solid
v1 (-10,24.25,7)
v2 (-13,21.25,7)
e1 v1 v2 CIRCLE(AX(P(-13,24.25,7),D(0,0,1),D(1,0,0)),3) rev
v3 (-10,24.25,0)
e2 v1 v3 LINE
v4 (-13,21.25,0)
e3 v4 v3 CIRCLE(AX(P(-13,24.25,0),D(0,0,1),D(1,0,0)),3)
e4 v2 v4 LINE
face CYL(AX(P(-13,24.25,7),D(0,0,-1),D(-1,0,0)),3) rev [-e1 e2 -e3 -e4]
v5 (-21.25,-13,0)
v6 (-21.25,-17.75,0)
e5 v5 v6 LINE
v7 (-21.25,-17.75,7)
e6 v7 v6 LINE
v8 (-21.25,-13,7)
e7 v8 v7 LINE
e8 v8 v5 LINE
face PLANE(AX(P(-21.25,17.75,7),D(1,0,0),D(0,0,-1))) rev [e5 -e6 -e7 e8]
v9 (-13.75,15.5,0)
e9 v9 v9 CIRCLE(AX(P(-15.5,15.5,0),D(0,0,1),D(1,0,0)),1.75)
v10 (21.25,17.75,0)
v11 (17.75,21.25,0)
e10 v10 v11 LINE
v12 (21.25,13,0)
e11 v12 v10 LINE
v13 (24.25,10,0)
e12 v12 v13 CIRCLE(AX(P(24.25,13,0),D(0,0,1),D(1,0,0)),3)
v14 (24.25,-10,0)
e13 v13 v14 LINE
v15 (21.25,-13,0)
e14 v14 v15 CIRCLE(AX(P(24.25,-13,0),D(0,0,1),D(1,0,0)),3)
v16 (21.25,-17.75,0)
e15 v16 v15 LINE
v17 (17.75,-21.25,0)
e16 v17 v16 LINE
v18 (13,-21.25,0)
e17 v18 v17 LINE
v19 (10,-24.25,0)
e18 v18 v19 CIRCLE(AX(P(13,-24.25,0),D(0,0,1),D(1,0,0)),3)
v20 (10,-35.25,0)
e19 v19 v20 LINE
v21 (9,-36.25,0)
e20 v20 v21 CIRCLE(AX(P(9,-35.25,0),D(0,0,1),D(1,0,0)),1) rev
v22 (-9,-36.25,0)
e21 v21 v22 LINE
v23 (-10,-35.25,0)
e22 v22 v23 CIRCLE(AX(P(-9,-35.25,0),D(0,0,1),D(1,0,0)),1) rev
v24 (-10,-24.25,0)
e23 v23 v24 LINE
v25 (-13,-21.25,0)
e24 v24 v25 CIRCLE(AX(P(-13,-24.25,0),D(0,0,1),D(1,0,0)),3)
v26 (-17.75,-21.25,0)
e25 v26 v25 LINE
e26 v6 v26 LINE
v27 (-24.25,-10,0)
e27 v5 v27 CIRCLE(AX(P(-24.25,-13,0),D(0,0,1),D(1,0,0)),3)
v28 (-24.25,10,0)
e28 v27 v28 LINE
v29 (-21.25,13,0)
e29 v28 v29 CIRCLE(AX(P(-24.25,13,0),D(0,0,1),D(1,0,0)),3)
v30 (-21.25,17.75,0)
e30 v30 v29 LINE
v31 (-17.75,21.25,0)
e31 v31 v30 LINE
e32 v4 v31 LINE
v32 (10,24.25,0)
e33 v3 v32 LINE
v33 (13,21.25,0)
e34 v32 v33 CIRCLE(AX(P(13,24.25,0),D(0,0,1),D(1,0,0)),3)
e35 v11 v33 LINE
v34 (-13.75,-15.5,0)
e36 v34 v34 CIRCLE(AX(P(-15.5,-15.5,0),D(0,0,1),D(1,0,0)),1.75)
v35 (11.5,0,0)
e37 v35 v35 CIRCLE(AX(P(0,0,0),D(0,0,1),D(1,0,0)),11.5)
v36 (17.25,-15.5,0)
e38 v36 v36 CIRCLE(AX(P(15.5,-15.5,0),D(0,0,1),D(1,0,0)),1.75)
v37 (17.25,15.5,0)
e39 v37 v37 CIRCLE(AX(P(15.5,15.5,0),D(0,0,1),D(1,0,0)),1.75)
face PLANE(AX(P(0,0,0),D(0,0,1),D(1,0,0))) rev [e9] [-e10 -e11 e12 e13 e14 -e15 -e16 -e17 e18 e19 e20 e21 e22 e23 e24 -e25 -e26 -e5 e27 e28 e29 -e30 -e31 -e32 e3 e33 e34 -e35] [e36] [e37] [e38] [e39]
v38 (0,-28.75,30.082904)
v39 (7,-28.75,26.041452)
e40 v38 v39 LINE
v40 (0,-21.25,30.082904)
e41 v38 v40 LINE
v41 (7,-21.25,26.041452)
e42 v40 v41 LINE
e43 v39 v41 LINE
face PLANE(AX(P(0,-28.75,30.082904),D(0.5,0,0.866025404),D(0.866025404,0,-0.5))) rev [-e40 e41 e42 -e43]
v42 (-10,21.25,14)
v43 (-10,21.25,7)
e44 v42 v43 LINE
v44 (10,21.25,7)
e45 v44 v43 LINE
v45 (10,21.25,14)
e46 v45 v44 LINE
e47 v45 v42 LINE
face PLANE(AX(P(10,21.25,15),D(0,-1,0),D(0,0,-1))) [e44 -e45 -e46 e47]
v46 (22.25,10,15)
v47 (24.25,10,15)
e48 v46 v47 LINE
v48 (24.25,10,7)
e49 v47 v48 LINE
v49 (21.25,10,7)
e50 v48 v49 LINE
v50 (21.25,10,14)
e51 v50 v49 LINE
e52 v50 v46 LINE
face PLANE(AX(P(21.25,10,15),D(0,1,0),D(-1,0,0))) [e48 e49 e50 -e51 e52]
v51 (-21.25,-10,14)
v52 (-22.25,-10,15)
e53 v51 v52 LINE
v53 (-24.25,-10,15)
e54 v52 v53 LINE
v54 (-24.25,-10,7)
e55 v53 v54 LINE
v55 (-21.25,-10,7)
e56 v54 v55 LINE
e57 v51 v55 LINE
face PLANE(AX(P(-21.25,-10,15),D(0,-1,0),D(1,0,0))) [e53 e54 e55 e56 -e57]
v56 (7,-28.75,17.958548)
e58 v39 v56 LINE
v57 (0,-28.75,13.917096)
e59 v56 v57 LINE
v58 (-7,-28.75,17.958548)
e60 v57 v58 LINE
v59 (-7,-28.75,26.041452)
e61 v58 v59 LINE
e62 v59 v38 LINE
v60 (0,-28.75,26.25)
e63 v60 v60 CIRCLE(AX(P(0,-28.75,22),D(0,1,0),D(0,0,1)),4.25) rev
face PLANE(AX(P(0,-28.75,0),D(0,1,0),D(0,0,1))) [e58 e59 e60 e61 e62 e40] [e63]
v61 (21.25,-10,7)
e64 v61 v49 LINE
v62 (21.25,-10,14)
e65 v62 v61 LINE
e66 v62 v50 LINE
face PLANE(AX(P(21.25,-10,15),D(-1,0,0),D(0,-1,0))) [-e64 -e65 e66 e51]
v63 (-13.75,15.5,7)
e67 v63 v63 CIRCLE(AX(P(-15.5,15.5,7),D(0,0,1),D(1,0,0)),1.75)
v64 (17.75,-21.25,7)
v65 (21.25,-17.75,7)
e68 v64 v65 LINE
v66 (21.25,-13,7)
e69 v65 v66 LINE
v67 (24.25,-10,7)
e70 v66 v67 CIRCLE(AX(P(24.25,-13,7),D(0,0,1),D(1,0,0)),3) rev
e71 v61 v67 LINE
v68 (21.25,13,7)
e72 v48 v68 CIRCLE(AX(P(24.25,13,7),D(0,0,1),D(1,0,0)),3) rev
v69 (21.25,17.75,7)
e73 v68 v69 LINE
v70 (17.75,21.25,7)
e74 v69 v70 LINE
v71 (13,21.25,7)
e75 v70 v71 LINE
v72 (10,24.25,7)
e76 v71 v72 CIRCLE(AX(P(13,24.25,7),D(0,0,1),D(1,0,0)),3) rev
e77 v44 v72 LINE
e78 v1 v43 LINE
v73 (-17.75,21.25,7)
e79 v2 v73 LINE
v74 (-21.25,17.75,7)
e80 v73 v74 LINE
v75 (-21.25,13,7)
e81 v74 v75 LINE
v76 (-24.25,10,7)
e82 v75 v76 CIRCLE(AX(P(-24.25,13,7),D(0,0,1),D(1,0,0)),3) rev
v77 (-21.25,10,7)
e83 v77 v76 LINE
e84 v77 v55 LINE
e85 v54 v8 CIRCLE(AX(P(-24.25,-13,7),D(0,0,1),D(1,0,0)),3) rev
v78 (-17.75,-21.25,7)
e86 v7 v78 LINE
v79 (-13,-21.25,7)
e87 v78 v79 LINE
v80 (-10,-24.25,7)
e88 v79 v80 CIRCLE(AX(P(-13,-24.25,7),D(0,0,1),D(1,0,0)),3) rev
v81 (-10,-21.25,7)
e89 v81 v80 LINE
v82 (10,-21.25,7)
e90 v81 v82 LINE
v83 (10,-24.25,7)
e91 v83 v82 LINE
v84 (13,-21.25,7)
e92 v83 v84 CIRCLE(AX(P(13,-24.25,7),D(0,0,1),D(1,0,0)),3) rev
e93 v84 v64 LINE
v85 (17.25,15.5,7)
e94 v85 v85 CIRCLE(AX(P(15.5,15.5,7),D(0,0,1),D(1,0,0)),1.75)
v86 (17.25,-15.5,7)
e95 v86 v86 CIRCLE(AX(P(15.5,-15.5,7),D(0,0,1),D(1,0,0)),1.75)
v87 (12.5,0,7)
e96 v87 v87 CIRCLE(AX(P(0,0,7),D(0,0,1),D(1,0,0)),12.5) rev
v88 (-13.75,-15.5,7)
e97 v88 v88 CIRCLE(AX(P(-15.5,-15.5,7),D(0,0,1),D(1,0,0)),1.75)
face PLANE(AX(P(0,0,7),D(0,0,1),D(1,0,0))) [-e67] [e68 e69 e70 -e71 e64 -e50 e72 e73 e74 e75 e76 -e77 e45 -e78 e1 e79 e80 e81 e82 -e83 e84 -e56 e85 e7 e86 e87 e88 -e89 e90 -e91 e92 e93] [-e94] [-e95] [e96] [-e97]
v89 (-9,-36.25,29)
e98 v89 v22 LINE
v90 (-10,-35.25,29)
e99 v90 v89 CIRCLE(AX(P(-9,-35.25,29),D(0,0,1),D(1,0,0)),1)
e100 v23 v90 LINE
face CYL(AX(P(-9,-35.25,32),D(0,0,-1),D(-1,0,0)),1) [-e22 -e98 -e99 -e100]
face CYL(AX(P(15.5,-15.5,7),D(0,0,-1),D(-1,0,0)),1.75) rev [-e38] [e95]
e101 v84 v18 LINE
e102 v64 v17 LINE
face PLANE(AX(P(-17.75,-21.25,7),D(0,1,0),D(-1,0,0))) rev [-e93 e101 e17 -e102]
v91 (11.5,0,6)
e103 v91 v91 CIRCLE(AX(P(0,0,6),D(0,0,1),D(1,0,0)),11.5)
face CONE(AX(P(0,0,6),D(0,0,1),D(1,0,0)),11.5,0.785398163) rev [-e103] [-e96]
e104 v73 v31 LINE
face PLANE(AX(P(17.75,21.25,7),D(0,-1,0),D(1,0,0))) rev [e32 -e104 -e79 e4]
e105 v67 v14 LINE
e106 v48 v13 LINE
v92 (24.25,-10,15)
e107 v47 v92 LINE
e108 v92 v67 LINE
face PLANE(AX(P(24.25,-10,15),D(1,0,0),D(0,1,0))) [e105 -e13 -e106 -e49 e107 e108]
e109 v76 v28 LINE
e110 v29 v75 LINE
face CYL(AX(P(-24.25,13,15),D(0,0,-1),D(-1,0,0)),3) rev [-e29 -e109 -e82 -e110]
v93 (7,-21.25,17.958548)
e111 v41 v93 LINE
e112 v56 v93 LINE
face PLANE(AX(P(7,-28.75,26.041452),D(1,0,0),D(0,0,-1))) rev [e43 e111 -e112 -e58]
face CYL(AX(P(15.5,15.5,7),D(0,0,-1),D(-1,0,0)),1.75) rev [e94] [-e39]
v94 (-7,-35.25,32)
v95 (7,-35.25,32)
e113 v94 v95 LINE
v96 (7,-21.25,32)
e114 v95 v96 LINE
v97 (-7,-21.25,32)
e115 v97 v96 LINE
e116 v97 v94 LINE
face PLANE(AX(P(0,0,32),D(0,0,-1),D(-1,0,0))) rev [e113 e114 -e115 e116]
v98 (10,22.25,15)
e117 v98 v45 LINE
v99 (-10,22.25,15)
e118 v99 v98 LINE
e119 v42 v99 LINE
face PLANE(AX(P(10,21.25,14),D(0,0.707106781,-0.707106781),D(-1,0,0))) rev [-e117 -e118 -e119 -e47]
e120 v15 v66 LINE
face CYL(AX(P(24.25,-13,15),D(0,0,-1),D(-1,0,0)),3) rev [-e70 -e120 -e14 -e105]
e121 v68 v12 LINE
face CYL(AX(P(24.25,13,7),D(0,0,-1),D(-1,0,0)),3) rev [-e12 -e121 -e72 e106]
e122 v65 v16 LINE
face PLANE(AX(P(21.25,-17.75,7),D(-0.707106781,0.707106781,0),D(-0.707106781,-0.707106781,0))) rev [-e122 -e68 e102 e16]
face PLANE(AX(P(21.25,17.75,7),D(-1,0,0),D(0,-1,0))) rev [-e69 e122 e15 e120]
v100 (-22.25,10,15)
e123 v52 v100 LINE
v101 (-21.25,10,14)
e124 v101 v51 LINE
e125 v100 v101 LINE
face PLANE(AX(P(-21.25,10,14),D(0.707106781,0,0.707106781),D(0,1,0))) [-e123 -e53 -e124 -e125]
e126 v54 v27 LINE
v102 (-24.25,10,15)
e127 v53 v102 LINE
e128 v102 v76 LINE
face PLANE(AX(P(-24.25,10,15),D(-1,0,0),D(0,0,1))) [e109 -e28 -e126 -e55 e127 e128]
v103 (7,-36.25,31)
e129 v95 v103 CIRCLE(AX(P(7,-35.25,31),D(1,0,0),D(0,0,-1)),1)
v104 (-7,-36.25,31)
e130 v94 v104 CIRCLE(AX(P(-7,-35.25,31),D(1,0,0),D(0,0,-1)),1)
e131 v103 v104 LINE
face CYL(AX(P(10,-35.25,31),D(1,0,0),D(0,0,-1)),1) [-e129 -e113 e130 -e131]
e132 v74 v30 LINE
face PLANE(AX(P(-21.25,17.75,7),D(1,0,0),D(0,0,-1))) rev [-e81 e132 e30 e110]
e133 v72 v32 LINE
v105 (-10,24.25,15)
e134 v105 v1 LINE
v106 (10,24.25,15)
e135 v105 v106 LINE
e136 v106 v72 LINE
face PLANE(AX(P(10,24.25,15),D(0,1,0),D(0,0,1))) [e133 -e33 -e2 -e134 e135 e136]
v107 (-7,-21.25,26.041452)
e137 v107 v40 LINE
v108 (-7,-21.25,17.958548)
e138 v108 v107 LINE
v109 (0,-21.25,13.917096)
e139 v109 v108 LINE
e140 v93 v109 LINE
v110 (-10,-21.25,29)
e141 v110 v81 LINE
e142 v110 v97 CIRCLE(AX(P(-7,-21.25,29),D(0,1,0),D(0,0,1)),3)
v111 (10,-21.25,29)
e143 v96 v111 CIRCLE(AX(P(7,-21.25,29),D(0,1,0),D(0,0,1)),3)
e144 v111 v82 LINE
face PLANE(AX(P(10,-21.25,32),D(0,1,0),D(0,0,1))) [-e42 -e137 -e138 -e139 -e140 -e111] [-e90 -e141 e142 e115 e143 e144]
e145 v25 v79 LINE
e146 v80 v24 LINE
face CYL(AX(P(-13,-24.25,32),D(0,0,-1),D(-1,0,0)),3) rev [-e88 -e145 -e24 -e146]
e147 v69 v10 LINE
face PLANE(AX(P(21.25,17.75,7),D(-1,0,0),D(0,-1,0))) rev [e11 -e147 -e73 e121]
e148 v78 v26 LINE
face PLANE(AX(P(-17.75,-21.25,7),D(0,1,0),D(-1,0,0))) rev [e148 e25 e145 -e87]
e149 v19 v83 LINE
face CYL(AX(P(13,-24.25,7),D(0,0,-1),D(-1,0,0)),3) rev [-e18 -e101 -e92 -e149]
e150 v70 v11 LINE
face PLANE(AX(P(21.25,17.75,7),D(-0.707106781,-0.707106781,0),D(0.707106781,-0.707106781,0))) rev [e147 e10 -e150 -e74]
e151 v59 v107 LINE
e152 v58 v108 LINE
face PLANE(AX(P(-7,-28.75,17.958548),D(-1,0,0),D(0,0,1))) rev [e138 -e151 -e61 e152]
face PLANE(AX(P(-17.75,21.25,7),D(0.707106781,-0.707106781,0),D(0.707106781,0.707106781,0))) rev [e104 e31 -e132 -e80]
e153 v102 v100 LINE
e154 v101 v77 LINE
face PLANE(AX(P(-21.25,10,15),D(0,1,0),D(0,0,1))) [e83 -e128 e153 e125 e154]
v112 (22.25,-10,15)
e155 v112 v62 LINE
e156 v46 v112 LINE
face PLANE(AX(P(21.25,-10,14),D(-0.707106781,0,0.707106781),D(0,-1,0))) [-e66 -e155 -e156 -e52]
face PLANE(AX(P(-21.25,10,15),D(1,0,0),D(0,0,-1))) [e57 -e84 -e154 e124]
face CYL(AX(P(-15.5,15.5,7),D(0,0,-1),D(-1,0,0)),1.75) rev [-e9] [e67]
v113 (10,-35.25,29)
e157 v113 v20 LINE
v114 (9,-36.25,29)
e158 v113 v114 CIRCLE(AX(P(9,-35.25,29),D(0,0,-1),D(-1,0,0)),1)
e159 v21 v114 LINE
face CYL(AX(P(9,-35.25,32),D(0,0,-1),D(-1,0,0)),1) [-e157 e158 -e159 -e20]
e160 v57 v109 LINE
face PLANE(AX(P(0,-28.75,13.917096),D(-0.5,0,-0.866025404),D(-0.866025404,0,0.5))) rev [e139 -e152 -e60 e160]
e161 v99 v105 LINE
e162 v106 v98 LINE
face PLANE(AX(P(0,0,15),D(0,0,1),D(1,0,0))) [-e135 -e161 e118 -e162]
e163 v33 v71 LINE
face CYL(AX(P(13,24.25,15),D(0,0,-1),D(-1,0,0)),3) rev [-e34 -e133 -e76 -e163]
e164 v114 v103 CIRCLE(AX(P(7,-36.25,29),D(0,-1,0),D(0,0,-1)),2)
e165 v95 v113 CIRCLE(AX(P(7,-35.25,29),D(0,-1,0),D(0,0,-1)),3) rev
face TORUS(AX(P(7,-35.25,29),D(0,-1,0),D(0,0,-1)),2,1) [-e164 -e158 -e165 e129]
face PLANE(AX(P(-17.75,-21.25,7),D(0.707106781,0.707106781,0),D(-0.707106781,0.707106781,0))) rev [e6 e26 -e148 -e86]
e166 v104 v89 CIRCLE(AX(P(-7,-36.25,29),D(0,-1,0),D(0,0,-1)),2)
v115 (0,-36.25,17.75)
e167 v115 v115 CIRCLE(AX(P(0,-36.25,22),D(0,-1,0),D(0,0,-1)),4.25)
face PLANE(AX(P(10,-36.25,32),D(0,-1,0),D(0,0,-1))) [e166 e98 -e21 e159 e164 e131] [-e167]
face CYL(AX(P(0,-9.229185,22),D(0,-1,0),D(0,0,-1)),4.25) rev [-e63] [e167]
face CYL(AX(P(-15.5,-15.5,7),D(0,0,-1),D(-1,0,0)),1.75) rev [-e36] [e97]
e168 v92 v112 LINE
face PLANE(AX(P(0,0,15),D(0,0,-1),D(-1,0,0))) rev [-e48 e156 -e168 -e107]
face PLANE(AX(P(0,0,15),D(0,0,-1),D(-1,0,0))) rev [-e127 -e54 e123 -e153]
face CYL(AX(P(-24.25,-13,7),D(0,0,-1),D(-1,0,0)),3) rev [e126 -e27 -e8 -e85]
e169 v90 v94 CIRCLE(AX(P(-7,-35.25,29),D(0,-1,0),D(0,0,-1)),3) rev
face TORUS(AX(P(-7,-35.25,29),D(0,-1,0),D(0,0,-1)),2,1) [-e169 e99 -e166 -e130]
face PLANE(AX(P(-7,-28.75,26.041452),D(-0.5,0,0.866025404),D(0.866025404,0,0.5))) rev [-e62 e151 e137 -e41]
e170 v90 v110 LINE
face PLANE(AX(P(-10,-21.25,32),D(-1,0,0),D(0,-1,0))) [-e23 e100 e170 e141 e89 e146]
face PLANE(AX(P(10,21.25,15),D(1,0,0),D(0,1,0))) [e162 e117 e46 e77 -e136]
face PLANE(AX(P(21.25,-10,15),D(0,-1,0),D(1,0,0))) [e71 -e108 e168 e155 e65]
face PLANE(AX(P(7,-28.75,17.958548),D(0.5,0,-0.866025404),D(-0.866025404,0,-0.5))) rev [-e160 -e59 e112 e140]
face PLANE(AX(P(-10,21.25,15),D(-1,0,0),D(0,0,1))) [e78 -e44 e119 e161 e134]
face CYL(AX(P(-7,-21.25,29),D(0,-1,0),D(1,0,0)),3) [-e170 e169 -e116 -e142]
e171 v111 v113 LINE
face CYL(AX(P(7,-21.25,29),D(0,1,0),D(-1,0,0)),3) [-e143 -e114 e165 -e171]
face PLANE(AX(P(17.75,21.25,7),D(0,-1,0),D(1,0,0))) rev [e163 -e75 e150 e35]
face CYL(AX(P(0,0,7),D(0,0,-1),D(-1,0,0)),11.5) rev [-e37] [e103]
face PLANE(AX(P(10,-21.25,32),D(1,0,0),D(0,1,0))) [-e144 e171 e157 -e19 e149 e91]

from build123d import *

# Parameters (mm, degrees)
ESQUISSE1_R             = 11.5
ESQUISSE1_R_2           = 1.75
BOSS_EXTRU_1_DEPTH      = 7
ESQUISSE2_W             = 20
ESQUISSE2_H             = 3
ESQUISSE2_W_2           = 3
ESQUISSE2_H_2           = 20
BOSS_EXTRU_2_DEPTH      = 15
ESQUISSE3_W             = 20
ESQUISSE3_H             = 15
BOSS_EXTRU_3_DEPTH      = 32
CONG_1_R                = 3
CONG_2_R                = 3
CHANFREIN1_SIZE         = 1
ESQUISSE4_R             = 4.25
ENL_V_MAT_EXTRU_1_DEPTH = 15
CONG_3_R                = 1
ENL_V_MAT_EXTRU_2_DEPTH = 7.5


with BuildPart() as part:
    # Esquisse1 → Boss.-Extru.1 (new body)
    with BuildSketch(Plane.XY):
        Polygon((-17.749999999, 21.249999999), (-21.249999999, 17.749999999), (-21.249999999, -17.749999999), (-17.749999999, -21.250000001), (17.749999999, -21.250000001), (21.249999999, -17.749999999), (21.249999999, 17.749999999), (17.749999999, 21.249999999), align=None)
        Circle(ESQUISSE1_R, mode=Mode.SUBTRACT)
        with Locations((-15.5, 15.5)):
            Circle(ESQUISSE1_R_2, mode=Mode.SUBTRACT)
        with Locations((15.5, 15.5)):
            Circle(ESQUISSE1_R_2, mode=Mode.SUBTRACT)
        with Locations((15.5, -15.5)):
            Circle(ESQUISSE1_R_2, mode=Mode.SUBTRACT)
        with Locations((-15.5, -15.5)):
            Circle(ESQUISSE1_R_2, mode=Mode.SUBTRACT)
    extrude(amount=BOSS_EXTRU_1_DEPTH)

    # Esquisse2 → Boss.-Extru.2 (add)
    with BuildSketch(Plane(origin=(0, 0, 0), x_dir=(-1, 0, 0), z_dir=(0, 0, -1))):
        with Locations((0, 22.749999999)):
            Rectangle(ESQUISSE2_W, ESQUISSE2_H)
        with Locations((22.749999999, 0)):
            Rectangle(ESQUISSE2_W_2, ESQUISSE2_H_2)
        with Locations((-22.749999999, 0)):
            Rectangle(ESQUISSE2_W_2, ESQUISSE2_H_2)
    extrude(amount=-BOSS_EXTRU_2_DEPTH)

    # Esquisse3 → Boss.-Extru.3 (add)
    with BuildSketch(Plane(origin=(0, 0, 0), x_dir=(-1, 0, 0), z_dir=(0, 0, -1))):
        with Locations((0, -28.750000001)):
            Rectangle(ESQUISSE3_W, ESQUISSE3_H)
    extrude(amount=-BOSS_EXTRU_3_DEPTH)

    # Congé1
    cong_1_edges = [part.edges().sort_by_distance(p)[0] for p in [
        (-21.249999999, -10, 3.5),
        (-21.249999999, 10, 3.5),
        (-10, 21.249999999, 3.5),
        (10, 21.249999999, 3.5),
        (21.249999999, 10, 3.5),
        (21.249999999, -10, 3.5),
        (10, -21.250000001, 3.5),
        (-10, -21.250000001, 3.5),
    ]]
    fillet(cong_1_edges, radius=CONG_1_R - 0.0001)  # a hair under: the kernel refuses the full size

    # Congé2
    cong_2_edges = [part.edges().sort_by_distance(p)[0] for p in [
        (10, -28.750000001, 32),
        (-10, -28.750000001, 32),
    ]]
    fillet(cong_2_edges, radius=CONG_2_R)

    # Chanfrein1
    chanfrein1_edges = [part.edges().sort_by_distance(p)[0] for p in [
        (-11.5, 0, 7),
        (0, 21.249999999, 15),
        (-21.249999999, 0, 15),
        (21.249999999, 0, 15),
    ]]
    chamfer(chanfrein1_edges, length=CHANFREIN1_SIZE)

    # Esquisse4 → Enlèv. mat.-Extru.1 (cut)
    with BuildSketch(Plane(origin=(0, -36.250000001, 0), x_dir=(-1, 0, 0), z_dir=(0, -1, 0))):
        with Locations(Location((0, -22, 0), (0, 0, 90))):
            Circle(ESQUISSE4_R)
    extrude(amount=-ENL_V_MAT_EXTRU_1_DEPTH, mode=Mode.SUBTRACT)

    # Congé3
    cong_3_edges = [part.edges().sort_by_distance(p)[0] for p in [
        (10, -36.250000001, 14.5),
        (0, -36.250000001, 32),
        (-10, -36.250000001, 14.5),
        (-9.121320344, -36.250000001, 31.121320344),
        (9.121320344, -36.250000001, 31.121320344),
    ]]
    fillet(cong_3_edges, radius=CONG_3_R)

    # Esquisse5 → Enlèv. mat.-Extru.2 (cut)
    with BuildSketch(Plane(origin=(0, -21.250000001, 0), x_dir=(1, 0, 0), z_dir=(0, 1, 0))):
        Polygon((0, -30.082903769), (7, -26.041451884), (7, -17.958548116), (0, -13.917096231), (-7, -17.958548116), (-7, -26.041451884), align=None)
    extrude(amount=-ENL_V_MAT_EXTRU_2_DEPTH, mode=Mode.SUBTRACT)


solid = part.part
